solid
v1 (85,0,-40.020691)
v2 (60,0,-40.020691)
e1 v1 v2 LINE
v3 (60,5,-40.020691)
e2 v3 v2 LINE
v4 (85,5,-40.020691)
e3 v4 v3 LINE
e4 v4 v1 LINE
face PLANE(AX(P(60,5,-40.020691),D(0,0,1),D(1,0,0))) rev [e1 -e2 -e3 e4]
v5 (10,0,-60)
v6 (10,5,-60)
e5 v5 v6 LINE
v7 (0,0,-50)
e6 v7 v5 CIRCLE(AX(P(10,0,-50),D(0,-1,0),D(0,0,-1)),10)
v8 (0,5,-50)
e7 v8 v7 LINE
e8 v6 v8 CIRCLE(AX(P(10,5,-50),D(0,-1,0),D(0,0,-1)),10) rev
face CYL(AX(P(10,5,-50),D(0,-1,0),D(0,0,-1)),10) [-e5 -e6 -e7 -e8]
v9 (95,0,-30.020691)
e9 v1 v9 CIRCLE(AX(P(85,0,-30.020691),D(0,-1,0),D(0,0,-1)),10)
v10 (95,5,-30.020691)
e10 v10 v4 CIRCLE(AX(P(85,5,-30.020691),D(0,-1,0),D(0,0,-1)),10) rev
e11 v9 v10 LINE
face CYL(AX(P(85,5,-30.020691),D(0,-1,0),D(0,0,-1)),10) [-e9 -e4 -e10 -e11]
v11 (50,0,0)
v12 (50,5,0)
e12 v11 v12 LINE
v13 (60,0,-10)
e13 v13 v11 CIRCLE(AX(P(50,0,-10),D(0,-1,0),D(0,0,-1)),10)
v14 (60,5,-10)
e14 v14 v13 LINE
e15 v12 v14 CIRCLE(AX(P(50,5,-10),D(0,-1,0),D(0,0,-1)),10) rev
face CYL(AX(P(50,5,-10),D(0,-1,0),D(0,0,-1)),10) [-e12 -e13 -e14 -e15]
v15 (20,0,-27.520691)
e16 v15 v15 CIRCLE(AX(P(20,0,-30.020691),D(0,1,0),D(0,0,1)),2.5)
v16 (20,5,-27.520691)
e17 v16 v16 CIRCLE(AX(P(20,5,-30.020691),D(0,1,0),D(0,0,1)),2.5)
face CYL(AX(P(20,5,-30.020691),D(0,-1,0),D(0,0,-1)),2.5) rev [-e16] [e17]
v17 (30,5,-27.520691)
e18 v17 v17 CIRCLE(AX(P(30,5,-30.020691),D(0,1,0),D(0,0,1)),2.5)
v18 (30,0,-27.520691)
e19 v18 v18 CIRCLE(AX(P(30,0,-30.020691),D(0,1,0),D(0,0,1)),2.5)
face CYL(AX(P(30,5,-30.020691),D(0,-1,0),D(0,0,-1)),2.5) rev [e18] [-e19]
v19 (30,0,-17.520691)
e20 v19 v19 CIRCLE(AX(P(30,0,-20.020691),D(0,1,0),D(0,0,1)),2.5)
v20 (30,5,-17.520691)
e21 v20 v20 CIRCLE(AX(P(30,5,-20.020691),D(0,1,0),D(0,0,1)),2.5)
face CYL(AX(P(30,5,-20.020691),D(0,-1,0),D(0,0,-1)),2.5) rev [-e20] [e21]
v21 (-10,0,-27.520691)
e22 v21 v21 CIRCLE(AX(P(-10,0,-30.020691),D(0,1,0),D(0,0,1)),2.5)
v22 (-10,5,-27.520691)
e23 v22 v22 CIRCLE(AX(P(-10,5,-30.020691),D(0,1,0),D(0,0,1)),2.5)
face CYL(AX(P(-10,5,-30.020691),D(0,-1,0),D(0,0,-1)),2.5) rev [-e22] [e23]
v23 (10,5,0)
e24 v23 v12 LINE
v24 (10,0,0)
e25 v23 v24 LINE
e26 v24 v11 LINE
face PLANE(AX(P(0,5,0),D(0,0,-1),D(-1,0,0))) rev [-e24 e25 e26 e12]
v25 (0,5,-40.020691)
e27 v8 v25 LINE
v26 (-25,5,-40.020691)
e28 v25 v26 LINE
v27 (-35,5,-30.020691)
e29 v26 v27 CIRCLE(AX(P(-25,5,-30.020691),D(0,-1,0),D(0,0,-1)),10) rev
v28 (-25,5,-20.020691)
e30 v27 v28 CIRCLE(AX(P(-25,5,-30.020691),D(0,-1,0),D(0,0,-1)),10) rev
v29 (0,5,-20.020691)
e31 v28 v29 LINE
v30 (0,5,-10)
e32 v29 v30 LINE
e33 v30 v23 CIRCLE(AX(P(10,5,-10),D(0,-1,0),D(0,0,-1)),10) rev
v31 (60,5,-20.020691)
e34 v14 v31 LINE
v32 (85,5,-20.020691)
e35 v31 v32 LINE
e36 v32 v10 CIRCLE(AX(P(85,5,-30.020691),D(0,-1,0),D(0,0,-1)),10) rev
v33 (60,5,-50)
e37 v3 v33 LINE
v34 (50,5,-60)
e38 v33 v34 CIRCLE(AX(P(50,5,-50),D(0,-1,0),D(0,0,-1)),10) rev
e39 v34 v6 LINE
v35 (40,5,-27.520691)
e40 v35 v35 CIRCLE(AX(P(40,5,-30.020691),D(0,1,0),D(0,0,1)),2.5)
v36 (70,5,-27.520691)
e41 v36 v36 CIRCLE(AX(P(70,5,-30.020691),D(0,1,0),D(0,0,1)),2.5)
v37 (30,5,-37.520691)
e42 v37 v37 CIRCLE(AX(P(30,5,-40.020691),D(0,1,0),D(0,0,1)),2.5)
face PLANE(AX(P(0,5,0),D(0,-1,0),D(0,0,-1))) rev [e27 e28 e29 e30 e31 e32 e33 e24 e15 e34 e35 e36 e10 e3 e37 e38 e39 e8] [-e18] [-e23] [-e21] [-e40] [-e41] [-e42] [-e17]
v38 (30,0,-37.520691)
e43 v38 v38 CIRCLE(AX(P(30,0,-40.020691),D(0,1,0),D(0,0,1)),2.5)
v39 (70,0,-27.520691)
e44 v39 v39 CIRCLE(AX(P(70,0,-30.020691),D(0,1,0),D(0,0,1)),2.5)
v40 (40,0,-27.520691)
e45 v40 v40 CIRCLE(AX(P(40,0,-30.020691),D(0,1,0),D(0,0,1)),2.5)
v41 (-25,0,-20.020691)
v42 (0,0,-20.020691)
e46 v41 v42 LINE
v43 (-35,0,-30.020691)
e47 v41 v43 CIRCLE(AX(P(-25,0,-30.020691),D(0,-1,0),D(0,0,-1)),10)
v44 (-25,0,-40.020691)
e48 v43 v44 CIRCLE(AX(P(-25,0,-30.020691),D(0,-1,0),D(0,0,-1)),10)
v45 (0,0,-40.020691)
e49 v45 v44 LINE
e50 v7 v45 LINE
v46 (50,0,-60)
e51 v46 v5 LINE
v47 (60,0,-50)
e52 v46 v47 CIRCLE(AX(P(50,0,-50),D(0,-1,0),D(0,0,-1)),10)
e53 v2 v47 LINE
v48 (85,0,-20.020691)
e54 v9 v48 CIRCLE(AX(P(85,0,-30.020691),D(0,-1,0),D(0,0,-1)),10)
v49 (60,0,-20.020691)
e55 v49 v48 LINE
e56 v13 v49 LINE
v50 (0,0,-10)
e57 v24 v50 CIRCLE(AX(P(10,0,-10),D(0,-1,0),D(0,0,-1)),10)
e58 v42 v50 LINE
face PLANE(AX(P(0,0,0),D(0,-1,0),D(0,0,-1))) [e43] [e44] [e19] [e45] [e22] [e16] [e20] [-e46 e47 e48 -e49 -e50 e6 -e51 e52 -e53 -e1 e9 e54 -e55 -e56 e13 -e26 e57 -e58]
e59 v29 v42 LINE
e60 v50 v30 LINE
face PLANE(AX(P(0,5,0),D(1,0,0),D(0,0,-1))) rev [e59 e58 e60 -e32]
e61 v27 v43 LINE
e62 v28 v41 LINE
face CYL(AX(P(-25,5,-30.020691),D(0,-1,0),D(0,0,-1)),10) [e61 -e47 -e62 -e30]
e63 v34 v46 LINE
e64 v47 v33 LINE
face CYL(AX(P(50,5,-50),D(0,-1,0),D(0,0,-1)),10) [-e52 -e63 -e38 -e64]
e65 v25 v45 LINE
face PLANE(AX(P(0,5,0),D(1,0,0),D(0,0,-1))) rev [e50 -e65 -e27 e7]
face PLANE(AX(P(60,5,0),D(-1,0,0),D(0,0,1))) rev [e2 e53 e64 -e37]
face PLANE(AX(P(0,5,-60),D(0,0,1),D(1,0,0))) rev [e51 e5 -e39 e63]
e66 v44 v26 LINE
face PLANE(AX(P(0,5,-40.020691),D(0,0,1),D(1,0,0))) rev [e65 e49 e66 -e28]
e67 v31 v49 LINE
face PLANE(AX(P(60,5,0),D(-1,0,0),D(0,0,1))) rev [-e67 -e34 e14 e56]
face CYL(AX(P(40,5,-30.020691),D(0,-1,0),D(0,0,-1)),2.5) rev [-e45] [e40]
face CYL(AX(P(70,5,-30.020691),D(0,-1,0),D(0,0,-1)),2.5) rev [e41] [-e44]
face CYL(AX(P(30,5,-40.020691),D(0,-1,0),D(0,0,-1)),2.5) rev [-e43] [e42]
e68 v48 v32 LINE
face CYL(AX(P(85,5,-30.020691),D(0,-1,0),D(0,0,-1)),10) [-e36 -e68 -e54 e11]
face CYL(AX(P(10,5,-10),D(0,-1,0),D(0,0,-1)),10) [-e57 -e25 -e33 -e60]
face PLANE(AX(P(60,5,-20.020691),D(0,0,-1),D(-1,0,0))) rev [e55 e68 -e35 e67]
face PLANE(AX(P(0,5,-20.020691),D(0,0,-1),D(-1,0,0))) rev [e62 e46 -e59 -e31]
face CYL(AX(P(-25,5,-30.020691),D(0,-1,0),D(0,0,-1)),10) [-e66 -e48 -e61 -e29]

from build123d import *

# Parameters (mm, degrees)
SKETCH1_W           = 60
SKETCH1_H           = 60
SKETCH1_R           = 2.5
BOSS_EXTRUDE2_DEPTH = 5
SKETCH3_W           = 35
SKETCH3_H           = 20
BOSS_EXTRUDE3_DEPTH = 5
SKETCH5_R           = 2.5
CUT_EXTRUDE1_DEPTH  = 113.472218792
FILLET1_R           = 10
FILLET2_R           = 10
FILLET3_R           = 10


with BuildPart() as part:
    # Sketch1 → Boss-Extrude2 (new body)
    with BuildSketch(Plane(origin=(0, 0, 0), x_dir=(1, 0, 0), z_dir=(0, 1, 0))):
        with Locations((30, 30)):
            Rectangle(SKETCH1_W, SKETCH1_H)
        with Locations(Location((30, 40.020691429, 0), (0, 0, 270))):
            Circle(SKETCH1_R, mode=Mode.SUBTRACT)
        with Locations(Location((20, 30.020691429, 0), (0, 0, 270))):
            Circle(SKETCH1_R, mode=Mode.SUBTRACT)
        with Locations(Location((30, 20.020691429, 0), (0, 0, 270))):
            Circle(SKETCH1_R, mode=Mode.SUBTRACT)
        with Locations(Location((40, 30.020691429, 0), (0, 0, 270))):
            Circle(SKETCH1_R, mode=Mode.SUBTRACT)
        with Locations(Location((30, 30.020691429, 0), (0, 0, 270))):
            Circle(SKETCH1_R, mode=Mode.SUBTRACT)
    extrude(amount=BOSS_EXTRUDE2_DEPTH)

    # Sketch3 → Boss-Extrude3 (add)
    with BuildSketch(Plane(origin=(0, 0, 0), x_dir=(1, 0, 0), z_dir=(0, 1, 0))):
        with Locations((77.5, 30.020691429)):
            Rectangle(SKETCH3_W, SKETCH3_H)
        with Locations((-17.5, 30.020691429)):
            Rectangle(SKETCH3_W, SKETCH3_H)
    extrude(amount=BOSS_EXTRUDE3_DEPTH)

    # Sketch5 → Cut-Extrude1 (cut, through all)
    with BuildSketch(Plane(origin=(0, 0, 0), x_dir=(1, 0, 0), z_dir=(0, 1, 0))):
        with Locations(Location((70, 30.020691429, 0), (0, 0, 270))):
            Circle(SKETCH5_R)
        with Locations(Location((-10, 30.020691429, 0), (0, 0, 270))):
            Circle(SKETCH5_R)
    extrude(amount=CUT_EXTRUDE1_DEPTH, mode=Mode.SUBTRACT)

    # Fillet1
    fillet1_edges = [part.edges().sort_by_distance(p)[0] for p in [
        (95, 2.5, -20.020691429),
        (95, 2.5, -40.020691429),
    ]]
    fillet(fillet1_edges, radius=FILLET1_R - 0.0001)  # a hair under: the kernel refuses the full size

    # Fillet2
    fillet2_edges = [part.edges().sort_by_distance(p)[0] for p in [
        (-35, 2.5, -20.020691429),
        (-35, 2.5, -40.020691429),
    ]]
    fillet(fillet2_edges, radius=FILLET2_R - 0.0001)  # a hair under: the kernel refuses the full size

    # Fillet3
    fillet3_edges = [part.edges().sort_by_distance(p)[0] for p in [
        (0, 2.5, -60),
        (60, 2.5, -60),
        (60, 2.5, 0),
        (0, 2.5, 0),
    ]]
    fillet(fillet3_edges, radius=FILLET3_R)


solid = part.part
